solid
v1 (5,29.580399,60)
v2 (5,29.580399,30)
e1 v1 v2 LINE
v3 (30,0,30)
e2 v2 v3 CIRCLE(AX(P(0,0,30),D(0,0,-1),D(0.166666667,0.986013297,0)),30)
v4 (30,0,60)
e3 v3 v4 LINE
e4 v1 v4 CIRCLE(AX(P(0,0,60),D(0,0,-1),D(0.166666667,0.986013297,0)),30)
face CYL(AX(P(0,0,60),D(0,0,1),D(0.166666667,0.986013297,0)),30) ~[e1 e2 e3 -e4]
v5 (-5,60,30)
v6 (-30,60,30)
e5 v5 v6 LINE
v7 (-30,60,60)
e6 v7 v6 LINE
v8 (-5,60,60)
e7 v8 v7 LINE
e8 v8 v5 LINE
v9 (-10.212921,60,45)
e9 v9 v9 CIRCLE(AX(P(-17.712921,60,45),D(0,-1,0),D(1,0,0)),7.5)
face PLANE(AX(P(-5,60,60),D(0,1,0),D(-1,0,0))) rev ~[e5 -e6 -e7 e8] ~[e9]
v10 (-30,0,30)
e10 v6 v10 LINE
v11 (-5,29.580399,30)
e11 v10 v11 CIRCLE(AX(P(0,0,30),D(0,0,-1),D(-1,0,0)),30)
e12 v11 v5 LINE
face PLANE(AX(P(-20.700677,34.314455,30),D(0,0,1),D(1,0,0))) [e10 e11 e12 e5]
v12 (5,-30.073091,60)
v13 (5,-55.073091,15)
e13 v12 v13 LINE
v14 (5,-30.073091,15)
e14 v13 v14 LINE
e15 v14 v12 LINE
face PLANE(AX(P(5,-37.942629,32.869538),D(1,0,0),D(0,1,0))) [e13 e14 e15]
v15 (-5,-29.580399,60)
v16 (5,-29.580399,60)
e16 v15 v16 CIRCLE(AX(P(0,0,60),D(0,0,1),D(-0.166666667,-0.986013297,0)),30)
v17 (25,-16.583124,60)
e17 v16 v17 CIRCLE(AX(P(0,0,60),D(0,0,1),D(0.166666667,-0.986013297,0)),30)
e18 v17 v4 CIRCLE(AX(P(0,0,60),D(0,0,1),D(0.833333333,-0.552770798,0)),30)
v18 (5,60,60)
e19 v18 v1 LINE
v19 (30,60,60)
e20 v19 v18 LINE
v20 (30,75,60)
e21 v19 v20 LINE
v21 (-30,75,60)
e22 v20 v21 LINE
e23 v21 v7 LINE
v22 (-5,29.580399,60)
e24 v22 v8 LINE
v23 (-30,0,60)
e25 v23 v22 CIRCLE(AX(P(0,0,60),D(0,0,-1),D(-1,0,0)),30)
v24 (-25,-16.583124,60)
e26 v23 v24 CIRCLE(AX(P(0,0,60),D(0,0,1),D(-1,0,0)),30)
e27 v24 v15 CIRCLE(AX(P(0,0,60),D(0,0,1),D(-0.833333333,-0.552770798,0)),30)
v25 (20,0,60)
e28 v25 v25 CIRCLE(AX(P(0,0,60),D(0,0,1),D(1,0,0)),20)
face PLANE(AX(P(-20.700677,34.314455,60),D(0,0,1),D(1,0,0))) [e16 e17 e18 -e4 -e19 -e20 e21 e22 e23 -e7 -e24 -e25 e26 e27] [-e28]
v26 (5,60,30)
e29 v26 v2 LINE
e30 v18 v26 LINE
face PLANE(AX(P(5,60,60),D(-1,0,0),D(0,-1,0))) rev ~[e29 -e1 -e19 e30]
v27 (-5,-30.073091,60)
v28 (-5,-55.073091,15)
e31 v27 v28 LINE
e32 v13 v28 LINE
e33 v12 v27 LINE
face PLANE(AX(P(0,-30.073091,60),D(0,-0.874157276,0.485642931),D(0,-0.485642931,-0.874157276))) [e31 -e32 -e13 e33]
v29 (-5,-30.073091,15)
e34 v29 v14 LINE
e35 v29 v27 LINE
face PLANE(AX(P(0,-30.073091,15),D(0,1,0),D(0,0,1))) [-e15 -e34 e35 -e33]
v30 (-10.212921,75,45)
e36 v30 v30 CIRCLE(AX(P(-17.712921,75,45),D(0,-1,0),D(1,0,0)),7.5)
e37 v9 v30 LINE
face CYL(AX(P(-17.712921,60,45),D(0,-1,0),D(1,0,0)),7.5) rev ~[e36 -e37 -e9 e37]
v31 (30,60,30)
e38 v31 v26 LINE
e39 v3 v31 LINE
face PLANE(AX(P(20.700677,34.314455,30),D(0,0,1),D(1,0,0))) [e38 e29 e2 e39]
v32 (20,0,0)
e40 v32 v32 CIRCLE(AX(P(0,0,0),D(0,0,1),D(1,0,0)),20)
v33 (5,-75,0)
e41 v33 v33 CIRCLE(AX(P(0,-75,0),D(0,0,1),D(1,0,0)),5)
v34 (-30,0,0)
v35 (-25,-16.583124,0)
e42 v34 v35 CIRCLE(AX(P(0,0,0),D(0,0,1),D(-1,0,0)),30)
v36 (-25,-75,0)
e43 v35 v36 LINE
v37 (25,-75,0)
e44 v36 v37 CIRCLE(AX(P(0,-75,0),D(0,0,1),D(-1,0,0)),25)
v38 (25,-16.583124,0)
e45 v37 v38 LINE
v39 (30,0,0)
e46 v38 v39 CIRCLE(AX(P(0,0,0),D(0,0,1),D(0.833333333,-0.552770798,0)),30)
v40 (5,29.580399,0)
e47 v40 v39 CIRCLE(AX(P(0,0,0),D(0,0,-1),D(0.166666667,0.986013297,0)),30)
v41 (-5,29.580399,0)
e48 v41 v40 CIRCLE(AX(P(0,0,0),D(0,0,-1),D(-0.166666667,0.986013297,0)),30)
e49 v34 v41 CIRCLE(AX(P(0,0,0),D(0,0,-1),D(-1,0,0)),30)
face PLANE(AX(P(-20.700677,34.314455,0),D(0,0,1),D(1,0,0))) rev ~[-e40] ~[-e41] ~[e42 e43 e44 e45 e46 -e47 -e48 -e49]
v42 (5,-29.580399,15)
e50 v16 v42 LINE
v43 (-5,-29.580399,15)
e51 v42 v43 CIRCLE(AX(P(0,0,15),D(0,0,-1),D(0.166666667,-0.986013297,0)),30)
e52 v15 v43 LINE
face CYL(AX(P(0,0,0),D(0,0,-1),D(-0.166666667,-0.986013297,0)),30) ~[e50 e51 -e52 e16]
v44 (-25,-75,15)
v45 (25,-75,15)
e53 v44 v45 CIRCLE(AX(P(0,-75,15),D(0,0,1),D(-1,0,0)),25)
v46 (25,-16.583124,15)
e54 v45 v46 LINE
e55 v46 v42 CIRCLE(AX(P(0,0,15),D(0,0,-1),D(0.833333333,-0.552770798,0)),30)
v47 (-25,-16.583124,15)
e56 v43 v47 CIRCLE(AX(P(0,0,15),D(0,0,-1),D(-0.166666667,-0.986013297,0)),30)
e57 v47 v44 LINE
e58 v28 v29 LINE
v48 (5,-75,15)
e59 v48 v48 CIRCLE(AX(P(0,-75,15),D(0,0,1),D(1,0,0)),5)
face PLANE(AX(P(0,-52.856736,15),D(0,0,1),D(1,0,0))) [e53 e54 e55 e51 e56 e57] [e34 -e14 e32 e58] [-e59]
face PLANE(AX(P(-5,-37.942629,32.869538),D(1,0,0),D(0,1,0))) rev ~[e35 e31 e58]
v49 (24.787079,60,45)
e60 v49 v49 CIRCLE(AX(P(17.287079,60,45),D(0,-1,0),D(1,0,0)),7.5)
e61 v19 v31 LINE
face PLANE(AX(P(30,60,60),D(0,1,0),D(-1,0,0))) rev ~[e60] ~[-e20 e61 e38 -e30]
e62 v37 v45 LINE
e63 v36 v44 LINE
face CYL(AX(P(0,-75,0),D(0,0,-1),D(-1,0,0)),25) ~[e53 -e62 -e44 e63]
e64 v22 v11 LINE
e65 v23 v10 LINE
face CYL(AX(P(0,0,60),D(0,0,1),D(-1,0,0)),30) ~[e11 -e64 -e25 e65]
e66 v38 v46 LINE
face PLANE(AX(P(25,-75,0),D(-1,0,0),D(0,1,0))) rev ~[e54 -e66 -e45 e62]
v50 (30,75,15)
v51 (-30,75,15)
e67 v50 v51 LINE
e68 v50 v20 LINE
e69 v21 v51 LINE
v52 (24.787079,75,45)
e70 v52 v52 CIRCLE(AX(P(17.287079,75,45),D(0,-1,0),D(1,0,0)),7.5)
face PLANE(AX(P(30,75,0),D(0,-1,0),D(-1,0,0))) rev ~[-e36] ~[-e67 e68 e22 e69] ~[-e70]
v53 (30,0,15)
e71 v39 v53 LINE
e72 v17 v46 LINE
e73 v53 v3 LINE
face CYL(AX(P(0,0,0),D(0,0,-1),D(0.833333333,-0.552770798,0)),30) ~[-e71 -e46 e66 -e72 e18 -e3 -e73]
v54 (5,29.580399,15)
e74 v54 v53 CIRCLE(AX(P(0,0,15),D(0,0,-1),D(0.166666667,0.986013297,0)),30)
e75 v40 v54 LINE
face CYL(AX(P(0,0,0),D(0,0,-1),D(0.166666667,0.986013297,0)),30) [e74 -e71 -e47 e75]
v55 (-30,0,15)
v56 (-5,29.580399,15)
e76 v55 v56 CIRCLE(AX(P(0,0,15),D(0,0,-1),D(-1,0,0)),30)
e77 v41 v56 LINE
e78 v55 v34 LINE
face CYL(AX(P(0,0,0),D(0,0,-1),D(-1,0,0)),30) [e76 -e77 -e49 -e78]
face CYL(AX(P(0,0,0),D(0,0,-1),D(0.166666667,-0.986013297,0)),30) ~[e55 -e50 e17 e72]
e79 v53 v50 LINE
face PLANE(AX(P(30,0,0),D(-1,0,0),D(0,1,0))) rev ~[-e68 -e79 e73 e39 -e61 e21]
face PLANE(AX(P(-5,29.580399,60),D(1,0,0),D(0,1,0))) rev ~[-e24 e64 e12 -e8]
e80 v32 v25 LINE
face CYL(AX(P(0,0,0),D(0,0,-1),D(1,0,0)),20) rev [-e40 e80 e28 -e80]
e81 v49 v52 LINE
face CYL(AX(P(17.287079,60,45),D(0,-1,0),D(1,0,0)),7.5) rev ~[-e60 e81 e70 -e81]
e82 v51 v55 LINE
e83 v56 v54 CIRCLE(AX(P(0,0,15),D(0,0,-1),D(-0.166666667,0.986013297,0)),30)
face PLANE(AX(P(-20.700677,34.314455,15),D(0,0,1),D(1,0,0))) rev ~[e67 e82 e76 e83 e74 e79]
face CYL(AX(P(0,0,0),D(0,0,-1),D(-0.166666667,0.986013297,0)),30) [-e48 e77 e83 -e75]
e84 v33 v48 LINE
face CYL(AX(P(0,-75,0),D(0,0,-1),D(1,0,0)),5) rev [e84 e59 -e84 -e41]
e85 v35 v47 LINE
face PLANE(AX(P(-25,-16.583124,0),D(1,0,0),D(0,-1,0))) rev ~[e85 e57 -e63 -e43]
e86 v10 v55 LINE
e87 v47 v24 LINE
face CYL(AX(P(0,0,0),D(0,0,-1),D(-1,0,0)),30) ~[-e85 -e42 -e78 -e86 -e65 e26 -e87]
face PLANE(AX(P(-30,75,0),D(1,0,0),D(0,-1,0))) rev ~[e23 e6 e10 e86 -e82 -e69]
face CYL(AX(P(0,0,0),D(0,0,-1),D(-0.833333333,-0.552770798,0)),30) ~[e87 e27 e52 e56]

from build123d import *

# Parameters (mm, degrees)
F0_R      = 20
F1_DEPTH  = 60
F0_R_2    = 5
F2_DEPTH  = 15
F3_DEPTH  = 60
F4_DEPTH  = 45
F5_DEPTH  = 15
F7_DEPTH  = 30
F9_DEPTH  = 5
F10_R     = 7.5
F11_DEPTH = 15


with BuildPart() as f1:
    # F0 (on Top) → F1 (new body)
    with BuildSketch(Plane.XY):
        with BuildLine():
            ThreePointArc((25, -16.5831239518), (28.7228132327, -8.6602540378), (30, 0))
            ThreePointArc((30, 0), (22.9128784748, 19.364916731), (5, 29.5803989155))
            ThreePointArc((5, 29.5803989155), (0, 30), (-5, 29.5803989155))
            ThreePointArc((-5, 29.5803989155), (-22.9128784748, 19.364916731), (-30, 0))
            ThreePointArc((-30, 0), (-28.7228132327, -8.6602540378), (-25, -16.5831239518))
            ThreePointArc((-25, -16.5831239518), (-16.3472410247, -25.1548744954), (-5, -29.5803989155))
            ThreePointArc((-5, -29.5803989155), (0, -30), (5, -29.5803989155))
            ThreePointArc((5, -29.5803989155), (16.3472410247, -25.1548744954), (25, -16.5831239518))
        make_face()
        Circle(F0_R, mode=Mode.SUBTRACT)
    extrude(amount=F1_DEPTH)

    # F0 (on Top) → F2 (join)
    with BuildSketch(Plane.XY):
        with BuildLine():
            Line((25, -75), (25, -16.5831239518))
            ThreePointArc((25, -16.5831239518), (16.3472410247, -25.1548744954), (5, -29.5803989155))
            Line((5, -29.5803989155), (5, -54.5803989155))
            Line((5, -54.5803989155), (0, -54.5803989155))
            Line((0, -54.5803989155), (-5, -54.5803989155))
            Line((-5, -54.5803989155), (-5, -29.5803989155))
            ThreePointArc((-5, -29.5803989155), (-16.3472410247, -25.1548744954), (-25, -16.5831239518))
            Line((-25, -16.5831239518), (-25, -75))
            ThreePointArc((-25, -75), (0, -100), (25, -75))
        make_face()
        with Locations((0, -75)):
            Circle(F0_R_2, mode=Mode.SUBTRACT)
        with BuildLine():
            Line((5, -54.5803989155), (5, -29.5803989155))
            ThreePointArc((5, -29.5803989155), (0, -30), (-5, -29.5803989155))
            Line((-5, -29.5803989155), (-5, -54.5803989155))
            Line((-5, -54.5803989155), (0, -54.5803989155))
            Line((0, -54.5803989155), (5, -54.5803989155))
        make_face()
    extrude(amount=F2_DEPTH)

    # F0 (on Top) → F3 (join)
    with BuildSketch(Plane.XY):
        with BuildLine():
            ThreePointArc((-30, 0), (-22.9128784748, 19.364916731), (-5, 29.5803989155))
            Line((-5, 29.5803989155), (-5, 60))
            Line((-5, 60), (-30, 60))
            Line((-30, 60), (-30, 0))
        make_face()
        with BuildLine():
            ThreePointArc((-5, 29.5803989155), (0, 30), (5, 29.5803989155))
            Line((5, 29.5803989155), (5, 60))
            Line((5, 60), (30, 60))
            Line((30, 60), (30, 75))
            Line((30, 75), (-30, 75))
            Line((-30, 75), (-30, 60))
            Line((-30, 60), (-5, 60))
            Line((-5, 60), (-5, 29.5803989155))
        make_face()
        with BuildLine():
            ThreePointArc((5, 29.5803989155), (22.9128784748, 19.364916731), (30, 0))
            Line((30, 0), (30, 60))
            Line((30, 60), (5, 60))
            Line((5, 60), (5, 29.5803989155))
        make_face()
    extrude(amount=F3_DEPTH)

    # F0 (on Top) → F4 (join)
    with BuildSketch(Plane.XY):
        with BuildLine():
            ThreePointArc((25, -16.5831239518), (28.7228132327, -8.6602540378), (30, 0))
            ThreePointArc((30, 0), (22.9128784748, 19.364916731), (5, 29.5803989155))
            ThreePointArc((5, 29.5803989155), (0, 30), (-5, 29.5803989155))
            ThreePointArc((-5, 29.5803989155), (-22.9128784748, 19.364916731), (-30, 0))
            ThreePointArc((-30, 0), (-28.7228132327, -8.6602540378), (-25, -16.5831239518))
            ThreePointArc((-25, -16.5831239518), (-16.3472410247, -25.1548744954), (-5, -29.5803989155))
            ThreePointArc((-5, -29.5803989155), (0, -30), (5, -29.5803989155))
            ThreePointArc((5, -29.5803989155), (16.3472410247, -25.1548744954), (25, -16.5831239518))
        make_face()
        Circle(F0_R, mode=Mode.SUBTRACT)
        with BuildLine():
            ThreePointArc((-5, 29.5803989155), (0, 30), (5, 29.5803989155))
            Line((5, 29.5803989155), (5, 60))
            Line((5, 60), (30, 60))
            Line((30, 60), (30, 75))
            Line((30, 75), (-30, 75))
            Line((-30, 75), (-30, 60))
            Line((-30, 60), (-5, 60))
            Line((-5, 60), (-5, 29.5803989155))
        make_face()
    extrude(amount=F4_DEPTH)

    # F0 (on Top) → F5 (cut)
    with BuildSketch(Plane.XY):
        with BuildLine():
            ThreePointArc((-30, 0), (-22.9128784748, 19.364916731), (-5, 29.5803989155))
            Line((-5, 29.5803989155), (-5, 60))
            Line((-5, 60), (-30, 60))
            Line((-30, 60), (-30, 0))
        make_face()
        with BuildLine():
            ThreePointArc((-5, 29.5803989155), (0, 30), (5, 29.5803989155))
            Line((5, 29.5803989155), (5, 60))
            Line((5, 60), (30, 60))
            Line((30, 60), (30, 75))
            Line((30, 75), (-30, 75))
            Line((-30, 75), (-30, 60))
            Line((-30, 60), (-5, 60))
            Line((-5, 60), (-5, 29.5803989155))
        make_face()
        with BuildLine():
            ThreePointArc((5, 29.5803989155), (22.9128784748, 19.364916731), (30, 0))
            Line((30, 0), (30, 60))
            Line((30, 60), (5, 60))
            Line((5, 60), (5, 29.5803989155))
        make_face()
    extrude(amount=F5_DEPTH, mode=Mode.SUBTRACT)

    # F6 (on face) → F7 (cut)
    with BuildSketch(Plane.XY.offset(60)):
        with BuildLine():
            Line((-5, 29.5803989155), (-5, 60))
            Line((-5, 60), (-30, 60))
            Line((-30, 60), (-30, 0))
            ThreePointArc((-30, 0), (-22.9128784748, 19.364916731), (-5, 29.5803989155))
        make_face()
        with BuildLine():
            Line((5, 60), (5, 29.5803989155))
            ThreePointArc((5, 29.5803989155), (22.9128784748, 19.364916731), (30, 0))
            Line((30, 0), (30, 60))
            Line((30, 60), (5, 60))
        make_face()
    extrude(amount=-F7_DEPTH, mode=Mode.SUBTRACT)

    # F8 (on Right) → F9 (join, symmetric)
    with BuildSketch(Plane.YZ):
        Polygon((-55.0730913877, 15), (-30.0730913877, 15), (-30.0730913877, 60), align=None)
    extrude(amount=F9_DEPTH, both=True)

    # F10 (on face) → F11 (cut)
    with BuildSketch(Plane.XZ.offset(-60)):
        with Locations((-17.7129209042, 45)):
            Circle(F10_R)
        with Locations((17.2870790958, 45)):
            Circle(F10_R)
    extrude(amount=-F11_DEPTH, mode=Mode.SUBTRACT)


solid = f1.part
